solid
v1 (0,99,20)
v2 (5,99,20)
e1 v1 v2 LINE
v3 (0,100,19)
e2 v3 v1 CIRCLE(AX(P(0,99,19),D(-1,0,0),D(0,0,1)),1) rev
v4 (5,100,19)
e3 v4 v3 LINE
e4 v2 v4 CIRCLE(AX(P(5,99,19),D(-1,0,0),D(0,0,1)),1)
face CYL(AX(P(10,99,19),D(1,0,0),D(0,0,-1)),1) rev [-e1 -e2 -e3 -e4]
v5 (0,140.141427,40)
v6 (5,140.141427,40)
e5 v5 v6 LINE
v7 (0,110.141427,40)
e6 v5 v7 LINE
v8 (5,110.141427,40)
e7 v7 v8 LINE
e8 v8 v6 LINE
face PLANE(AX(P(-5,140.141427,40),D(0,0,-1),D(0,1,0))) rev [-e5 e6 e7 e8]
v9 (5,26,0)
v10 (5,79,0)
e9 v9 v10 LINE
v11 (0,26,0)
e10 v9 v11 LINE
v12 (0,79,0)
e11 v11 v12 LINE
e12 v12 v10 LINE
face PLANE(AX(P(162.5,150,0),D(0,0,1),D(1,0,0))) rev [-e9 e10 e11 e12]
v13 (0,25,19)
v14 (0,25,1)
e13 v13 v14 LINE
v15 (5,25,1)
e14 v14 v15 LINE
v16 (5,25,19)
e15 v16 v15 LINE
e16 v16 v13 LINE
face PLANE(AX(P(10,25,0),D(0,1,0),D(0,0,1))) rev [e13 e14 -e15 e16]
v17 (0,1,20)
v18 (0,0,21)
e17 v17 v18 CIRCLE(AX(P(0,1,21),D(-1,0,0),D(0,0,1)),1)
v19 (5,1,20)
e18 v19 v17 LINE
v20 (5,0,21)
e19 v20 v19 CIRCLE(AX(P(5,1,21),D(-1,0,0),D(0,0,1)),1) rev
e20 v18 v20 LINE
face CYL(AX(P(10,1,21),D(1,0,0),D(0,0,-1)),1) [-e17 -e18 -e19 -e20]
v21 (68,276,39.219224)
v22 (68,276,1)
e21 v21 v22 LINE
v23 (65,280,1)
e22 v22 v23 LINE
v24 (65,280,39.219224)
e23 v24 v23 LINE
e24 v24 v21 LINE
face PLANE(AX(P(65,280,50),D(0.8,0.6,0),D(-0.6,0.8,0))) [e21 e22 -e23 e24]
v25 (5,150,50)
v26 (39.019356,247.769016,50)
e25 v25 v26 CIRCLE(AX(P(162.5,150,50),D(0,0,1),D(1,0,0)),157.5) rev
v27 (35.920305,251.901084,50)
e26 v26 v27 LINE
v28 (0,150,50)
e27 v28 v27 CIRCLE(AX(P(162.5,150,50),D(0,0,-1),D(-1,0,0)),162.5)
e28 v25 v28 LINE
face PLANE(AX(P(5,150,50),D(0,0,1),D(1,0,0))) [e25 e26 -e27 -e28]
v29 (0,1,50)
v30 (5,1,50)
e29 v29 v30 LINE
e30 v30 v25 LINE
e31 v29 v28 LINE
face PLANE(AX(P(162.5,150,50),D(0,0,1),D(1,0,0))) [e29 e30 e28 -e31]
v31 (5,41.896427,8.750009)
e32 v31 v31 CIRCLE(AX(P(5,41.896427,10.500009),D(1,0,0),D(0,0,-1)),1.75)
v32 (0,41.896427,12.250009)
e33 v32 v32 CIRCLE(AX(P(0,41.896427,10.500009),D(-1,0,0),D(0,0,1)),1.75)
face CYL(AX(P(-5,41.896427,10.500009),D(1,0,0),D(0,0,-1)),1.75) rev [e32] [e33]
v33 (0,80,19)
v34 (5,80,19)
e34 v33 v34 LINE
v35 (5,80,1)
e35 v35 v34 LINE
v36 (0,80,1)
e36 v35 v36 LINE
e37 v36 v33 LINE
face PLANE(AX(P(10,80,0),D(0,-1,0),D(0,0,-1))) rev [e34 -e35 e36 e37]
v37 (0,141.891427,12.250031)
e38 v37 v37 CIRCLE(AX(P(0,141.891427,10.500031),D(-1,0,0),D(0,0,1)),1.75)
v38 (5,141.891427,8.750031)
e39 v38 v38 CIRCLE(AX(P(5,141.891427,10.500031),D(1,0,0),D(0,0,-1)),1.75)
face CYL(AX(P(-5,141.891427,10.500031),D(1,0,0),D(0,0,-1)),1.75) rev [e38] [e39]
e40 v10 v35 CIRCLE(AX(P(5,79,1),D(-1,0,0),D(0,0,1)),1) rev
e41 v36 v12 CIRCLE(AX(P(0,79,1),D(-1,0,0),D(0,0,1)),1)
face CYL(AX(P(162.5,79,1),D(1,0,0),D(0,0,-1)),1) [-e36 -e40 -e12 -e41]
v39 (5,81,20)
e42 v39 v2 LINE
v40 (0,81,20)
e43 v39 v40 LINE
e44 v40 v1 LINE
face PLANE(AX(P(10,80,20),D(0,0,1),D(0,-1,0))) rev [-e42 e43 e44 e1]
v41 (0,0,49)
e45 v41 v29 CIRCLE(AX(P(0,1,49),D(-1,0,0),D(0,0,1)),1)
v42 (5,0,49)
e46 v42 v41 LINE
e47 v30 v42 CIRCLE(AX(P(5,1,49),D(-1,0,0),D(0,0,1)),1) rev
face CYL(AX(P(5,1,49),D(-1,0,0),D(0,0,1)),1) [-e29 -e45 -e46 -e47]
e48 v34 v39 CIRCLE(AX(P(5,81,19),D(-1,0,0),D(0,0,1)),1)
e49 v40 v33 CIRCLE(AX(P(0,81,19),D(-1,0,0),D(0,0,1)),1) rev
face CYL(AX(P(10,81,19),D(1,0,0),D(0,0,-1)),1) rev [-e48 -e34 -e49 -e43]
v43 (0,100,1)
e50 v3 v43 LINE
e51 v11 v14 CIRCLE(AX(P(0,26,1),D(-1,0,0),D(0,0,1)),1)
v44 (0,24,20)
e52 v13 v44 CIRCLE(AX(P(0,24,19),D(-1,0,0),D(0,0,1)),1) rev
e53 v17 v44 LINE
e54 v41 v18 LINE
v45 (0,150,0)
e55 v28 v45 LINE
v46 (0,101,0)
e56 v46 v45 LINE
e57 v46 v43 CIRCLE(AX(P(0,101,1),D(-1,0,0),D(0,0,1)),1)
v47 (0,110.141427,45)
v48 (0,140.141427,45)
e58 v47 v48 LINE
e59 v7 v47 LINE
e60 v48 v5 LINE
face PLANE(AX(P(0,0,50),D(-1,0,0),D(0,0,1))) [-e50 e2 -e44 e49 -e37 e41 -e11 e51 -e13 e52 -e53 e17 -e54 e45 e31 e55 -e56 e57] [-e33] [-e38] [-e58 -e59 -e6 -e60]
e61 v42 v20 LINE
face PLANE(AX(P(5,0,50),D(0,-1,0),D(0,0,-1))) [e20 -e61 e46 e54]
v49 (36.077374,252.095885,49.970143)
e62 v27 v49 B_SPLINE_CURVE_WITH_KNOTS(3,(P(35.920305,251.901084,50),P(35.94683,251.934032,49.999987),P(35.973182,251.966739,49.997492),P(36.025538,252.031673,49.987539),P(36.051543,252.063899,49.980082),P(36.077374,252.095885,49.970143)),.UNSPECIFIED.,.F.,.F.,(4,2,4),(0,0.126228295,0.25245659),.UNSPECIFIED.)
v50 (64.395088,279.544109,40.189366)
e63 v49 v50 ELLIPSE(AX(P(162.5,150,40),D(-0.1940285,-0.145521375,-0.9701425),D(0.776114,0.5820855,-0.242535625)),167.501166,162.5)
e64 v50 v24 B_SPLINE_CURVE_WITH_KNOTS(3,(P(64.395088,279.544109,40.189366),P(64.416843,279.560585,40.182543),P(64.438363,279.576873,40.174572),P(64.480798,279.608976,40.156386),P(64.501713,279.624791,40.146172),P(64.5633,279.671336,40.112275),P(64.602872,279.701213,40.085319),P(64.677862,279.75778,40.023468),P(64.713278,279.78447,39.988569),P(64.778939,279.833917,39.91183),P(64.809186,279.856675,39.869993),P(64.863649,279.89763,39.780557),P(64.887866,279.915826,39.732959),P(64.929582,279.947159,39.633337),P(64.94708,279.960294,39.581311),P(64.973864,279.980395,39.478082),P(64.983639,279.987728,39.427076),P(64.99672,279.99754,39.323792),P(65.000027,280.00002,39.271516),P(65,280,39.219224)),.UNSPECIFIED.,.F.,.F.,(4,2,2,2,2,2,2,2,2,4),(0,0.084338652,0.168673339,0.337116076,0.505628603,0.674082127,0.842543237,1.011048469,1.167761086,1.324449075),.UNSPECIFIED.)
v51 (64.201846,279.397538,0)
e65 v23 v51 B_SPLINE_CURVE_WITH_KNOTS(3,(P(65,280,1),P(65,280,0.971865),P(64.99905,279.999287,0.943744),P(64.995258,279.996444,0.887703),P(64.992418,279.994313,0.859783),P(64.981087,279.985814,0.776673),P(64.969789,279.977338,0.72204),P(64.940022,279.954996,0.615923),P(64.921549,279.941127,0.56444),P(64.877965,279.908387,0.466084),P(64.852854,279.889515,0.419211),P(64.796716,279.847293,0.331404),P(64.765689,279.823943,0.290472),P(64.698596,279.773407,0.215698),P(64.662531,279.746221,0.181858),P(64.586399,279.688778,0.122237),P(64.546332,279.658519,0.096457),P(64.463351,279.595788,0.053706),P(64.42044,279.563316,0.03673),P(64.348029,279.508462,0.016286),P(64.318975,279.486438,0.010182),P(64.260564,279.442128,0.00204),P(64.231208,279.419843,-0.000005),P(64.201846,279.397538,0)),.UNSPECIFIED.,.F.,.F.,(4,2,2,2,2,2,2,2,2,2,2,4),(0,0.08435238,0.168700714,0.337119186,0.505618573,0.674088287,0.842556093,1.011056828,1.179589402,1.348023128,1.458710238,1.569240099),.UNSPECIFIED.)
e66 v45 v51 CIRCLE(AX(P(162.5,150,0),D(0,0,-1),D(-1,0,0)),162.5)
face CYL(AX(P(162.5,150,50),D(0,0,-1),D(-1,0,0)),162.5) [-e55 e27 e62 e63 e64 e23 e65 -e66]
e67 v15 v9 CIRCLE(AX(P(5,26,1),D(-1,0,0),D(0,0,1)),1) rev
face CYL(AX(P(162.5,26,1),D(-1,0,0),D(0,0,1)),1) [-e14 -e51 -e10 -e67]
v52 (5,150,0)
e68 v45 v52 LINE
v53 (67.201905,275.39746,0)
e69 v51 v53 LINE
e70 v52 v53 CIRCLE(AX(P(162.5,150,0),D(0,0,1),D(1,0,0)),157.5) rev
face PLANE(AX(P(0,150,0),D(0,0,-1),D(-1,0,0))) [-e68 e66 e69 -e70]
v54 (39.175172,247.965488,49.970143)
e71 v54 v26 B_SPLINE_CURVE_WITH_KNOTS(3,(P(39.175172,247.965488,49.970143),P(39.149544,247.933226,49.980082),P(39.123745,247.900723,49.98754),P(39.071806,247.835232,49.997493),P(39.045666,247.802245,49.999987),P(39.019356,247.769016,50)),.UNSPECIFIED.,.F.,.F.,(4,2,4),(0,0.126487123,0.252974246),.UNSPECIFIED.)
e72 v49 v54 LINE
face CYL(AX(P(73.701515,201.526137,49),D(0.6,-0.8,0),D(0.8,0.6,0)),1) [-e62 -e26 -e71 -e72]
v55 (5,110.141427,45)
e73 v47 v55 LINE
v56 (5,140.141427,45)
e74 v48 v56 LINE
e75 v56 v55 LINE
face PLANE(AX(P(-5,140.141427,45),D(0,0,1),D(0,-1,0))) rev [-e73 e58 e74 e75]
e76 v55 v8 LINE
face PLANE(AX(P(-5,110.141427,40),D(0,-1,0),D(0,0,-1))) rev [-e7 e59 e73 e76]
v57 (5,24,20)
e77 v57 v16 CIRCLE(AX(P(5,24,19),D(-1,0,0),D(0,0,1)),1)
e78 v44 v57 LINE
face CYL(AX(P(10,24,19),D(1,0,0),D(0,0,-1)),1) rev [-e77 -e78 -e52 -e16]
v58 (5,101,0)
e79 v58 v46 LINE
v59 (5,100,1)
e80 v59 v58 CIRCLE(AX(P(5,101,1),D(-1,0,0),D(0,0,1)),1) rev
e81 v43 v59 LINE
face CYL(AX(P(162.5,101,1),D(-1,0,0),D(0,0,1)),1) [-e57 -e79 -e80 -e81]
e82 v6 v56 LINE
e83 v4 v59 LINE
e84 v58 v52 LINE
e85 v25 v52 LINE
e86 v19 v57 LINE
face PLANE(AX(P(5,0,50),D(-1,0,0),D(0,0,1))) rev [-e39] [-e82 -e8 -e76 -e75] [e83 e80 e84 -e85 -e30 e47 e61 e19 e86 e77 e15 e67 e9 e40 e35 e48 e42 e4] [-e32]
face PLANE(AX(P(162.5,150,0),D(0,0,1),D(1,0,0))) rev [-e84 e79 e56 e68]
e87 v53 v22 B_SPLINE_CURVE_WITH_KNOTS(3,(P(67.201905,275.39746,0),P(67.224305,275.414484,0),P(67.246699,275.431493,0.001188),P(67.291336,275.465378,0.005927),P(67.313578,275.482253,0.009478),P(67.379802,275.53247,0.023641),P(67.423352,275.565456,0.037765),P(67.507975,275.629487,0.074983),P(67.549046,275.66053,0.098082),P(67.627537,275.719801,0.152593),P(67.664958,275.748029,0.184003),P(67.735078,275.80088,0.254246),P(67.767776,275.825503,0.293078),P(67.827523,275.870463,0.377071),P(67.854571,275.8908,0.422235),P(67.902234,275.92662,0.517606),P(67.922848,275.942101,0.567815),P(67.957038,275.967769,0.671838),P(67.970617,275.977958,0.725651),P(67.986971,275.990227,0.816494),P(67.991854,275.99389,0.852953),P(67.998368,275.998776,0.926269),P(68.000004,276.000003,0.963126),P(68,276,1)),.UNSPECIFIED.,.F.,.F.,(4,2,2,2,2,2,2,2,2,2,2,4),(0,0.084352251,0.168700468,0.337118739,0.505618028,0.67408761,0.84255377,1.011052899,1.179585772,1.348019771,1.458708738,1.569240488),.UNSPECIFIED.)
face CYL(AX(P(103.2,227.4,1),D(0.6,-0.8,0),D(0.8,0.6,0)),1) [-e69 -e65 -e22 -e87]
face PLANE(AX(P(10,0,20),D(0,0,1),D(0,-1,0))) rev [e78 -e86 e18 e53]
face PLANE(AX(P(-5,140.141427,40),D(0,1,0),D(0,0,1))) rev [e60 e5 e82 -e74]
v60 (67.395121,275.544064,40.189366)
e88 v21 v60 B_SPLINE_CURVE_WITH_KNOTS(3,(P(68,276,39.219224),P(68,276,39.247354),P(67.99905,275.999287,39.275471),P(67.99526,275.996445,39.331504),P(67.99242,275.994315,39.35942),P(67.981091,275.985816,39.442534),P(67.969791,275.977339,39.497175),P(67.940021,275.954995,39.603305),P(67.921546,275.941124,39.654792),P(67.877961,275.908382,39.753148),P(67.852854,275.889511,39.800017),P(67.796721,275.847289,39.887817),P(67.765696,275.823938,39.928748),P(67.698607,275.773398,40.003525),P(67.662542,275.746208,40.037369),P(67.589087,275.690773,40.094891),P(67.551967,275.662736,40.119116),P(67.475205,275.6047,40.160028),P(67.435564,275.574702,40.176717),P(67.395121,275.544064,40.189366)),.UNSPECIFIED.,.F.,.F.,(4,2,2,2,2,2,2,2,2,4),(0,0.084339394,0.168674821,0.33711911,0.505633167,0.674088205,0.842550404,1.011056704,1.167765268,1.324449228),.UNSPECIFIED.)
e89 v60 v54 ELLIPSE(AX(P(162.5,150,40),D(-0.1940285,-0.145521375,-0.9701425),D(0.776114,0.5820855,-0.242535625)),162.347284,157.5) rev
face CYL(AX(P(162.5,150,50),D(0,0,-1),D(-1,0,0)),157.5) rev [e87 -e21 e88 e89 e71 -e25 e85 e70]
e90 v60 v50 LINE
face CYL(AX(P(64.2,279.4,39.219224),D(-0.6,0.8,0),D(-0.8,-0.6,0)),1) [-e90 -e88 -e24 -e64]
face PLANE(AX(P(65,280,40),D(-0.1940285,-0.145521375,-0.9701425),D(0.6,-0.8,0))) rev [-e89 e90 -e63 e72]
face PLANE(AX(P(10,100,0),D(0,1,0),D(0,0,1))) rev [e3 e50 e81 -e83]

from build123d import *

# Parameters (mm, degrees)
BASE_FLANGE2_DEPTH = 50
SKETCH14_R         = 1.7500000000000004
CUT_EXTRUDE1_DEPTH = 10
CUT_EXTRUDE2_DEPTH = 10
CHAMFER1_SIZE      = 40
CHAMFER1_SIZE2     = 10
FILLET1_R          = 1
CUT_EXTRUDE3_DEPTH = 10


# Sheet-metal steps are written as plain solids
with BuildPart() as part:
    # Sketch13 → Base-Flange2 (new body)
    with BuildSketch(Plane.XY):
        with BuildLine():
            Line((0, 0), (0, 150))
            ThreePointArc((0, 150), (17.155581462513624, 222.67220926874307), (64.99999999999997, 279.99999999999994))
            Line((64.99999999999997, 279.99999999999994), (67.99999999999997, 275.99999999999994))
            ThreePointArc((67.99999999999997, 275.99999999999994), (21.627717417513225, 220.4361412912433), (5, 150))
            Line((5, 150), (5, 0))
            Line((5, 0), (0, 0))
        make_face()
    extrude(amount=BASE_FLANGE2_DEPTH)

    # Sketch14 → Cut-Extrude1 (cut)
    with BuildSketch(Plane(origin=(5, 0, 0), x_dir=(0, 0, -1), z_dir=(1, 0, 0))):
        with Locations((-10.500030729924669, 141.8914274868206)):
            Circle(SKETCH14_R)
        with Locations((-10.500008780040803, 41.896427486823015)):
            Circle(SKETCH14_R)
    extrude(amount=-CUT_EXTRUDE1_DEPTH, mode=Mode.SUBTRACT)

    # Sketch15 → Cut-Extrude2 (cut)
    with BuildSketch(Plane.ZY):
        Polygon((0, 0), (20.000000000000004, 0), (19.999999999999996, 25), (0, 25), align=None)
        Polygon((6.94e-15, 80), (20.000000000000007, 80), (20.000000000000004, 100), (0, 100), align=None)
    extrude(amount=-CUT_EXTRUDE2_DEPTH, mode=Mode.SUBTRACT)

    # Chamfer1
    chamfer1_edges = [part.edges().sort_by_distance(p)[0] for p in [
        (66.49999999999997, 277.99999999999994, 50),
    ]]
    chamfer1_side = [part.faces().sort_by_distance(p)[0] for p in [
        (2.88138855415232, 75, 50),
    ]]
    chamfer(chamfer1_edges, length=CHAMFER1_SIZE, length2=CHAMFER1_SIZE2, reference=chamfer1_side[0])

    # Fillet1
    fillet1_edges = [part.edges().sort_by_distance(p)[0] for p in [
        (2.5, 0, 50),
        (2.5, 80, 6.94e-15),
        (2.5, 100, 0),
        (2.5, 25, 0),
        (2.5, 25, 19.999999999999996),
        (2.5, 0, 20.000000000000004),
        (2.5, 100, 20.000000000000004),
        (2.5, 80, 20.000000000000007),
        (66.49999999999997, 277.99999999999994, 0),
        (66.49999999999996, 277.99999999999994, 40),
        (37.54920679025358, 249.93439094632848, 50),
    ]]
    fillet(fillet1_edges, radius=FILLET1_R)

    # Sketch16 → Cut-Extrude3 (cut)
    with BuildSketch(Plane(origin=(5, 0, 0), x_dir=(0, 0, -1), z_dir=(1, 0, 0))):
        Polygon((-40, 140.1414274868206), (-40.00000000000002, 110.1414274868206), (-45.000000000000014, 110.1414274868206), (-45, 140.1414274868206), align=None)
    extrude(amount=-CUT_EXTRUDE3_DEPTH, mode=Mode.SUBTRACT)


solid = part.part
